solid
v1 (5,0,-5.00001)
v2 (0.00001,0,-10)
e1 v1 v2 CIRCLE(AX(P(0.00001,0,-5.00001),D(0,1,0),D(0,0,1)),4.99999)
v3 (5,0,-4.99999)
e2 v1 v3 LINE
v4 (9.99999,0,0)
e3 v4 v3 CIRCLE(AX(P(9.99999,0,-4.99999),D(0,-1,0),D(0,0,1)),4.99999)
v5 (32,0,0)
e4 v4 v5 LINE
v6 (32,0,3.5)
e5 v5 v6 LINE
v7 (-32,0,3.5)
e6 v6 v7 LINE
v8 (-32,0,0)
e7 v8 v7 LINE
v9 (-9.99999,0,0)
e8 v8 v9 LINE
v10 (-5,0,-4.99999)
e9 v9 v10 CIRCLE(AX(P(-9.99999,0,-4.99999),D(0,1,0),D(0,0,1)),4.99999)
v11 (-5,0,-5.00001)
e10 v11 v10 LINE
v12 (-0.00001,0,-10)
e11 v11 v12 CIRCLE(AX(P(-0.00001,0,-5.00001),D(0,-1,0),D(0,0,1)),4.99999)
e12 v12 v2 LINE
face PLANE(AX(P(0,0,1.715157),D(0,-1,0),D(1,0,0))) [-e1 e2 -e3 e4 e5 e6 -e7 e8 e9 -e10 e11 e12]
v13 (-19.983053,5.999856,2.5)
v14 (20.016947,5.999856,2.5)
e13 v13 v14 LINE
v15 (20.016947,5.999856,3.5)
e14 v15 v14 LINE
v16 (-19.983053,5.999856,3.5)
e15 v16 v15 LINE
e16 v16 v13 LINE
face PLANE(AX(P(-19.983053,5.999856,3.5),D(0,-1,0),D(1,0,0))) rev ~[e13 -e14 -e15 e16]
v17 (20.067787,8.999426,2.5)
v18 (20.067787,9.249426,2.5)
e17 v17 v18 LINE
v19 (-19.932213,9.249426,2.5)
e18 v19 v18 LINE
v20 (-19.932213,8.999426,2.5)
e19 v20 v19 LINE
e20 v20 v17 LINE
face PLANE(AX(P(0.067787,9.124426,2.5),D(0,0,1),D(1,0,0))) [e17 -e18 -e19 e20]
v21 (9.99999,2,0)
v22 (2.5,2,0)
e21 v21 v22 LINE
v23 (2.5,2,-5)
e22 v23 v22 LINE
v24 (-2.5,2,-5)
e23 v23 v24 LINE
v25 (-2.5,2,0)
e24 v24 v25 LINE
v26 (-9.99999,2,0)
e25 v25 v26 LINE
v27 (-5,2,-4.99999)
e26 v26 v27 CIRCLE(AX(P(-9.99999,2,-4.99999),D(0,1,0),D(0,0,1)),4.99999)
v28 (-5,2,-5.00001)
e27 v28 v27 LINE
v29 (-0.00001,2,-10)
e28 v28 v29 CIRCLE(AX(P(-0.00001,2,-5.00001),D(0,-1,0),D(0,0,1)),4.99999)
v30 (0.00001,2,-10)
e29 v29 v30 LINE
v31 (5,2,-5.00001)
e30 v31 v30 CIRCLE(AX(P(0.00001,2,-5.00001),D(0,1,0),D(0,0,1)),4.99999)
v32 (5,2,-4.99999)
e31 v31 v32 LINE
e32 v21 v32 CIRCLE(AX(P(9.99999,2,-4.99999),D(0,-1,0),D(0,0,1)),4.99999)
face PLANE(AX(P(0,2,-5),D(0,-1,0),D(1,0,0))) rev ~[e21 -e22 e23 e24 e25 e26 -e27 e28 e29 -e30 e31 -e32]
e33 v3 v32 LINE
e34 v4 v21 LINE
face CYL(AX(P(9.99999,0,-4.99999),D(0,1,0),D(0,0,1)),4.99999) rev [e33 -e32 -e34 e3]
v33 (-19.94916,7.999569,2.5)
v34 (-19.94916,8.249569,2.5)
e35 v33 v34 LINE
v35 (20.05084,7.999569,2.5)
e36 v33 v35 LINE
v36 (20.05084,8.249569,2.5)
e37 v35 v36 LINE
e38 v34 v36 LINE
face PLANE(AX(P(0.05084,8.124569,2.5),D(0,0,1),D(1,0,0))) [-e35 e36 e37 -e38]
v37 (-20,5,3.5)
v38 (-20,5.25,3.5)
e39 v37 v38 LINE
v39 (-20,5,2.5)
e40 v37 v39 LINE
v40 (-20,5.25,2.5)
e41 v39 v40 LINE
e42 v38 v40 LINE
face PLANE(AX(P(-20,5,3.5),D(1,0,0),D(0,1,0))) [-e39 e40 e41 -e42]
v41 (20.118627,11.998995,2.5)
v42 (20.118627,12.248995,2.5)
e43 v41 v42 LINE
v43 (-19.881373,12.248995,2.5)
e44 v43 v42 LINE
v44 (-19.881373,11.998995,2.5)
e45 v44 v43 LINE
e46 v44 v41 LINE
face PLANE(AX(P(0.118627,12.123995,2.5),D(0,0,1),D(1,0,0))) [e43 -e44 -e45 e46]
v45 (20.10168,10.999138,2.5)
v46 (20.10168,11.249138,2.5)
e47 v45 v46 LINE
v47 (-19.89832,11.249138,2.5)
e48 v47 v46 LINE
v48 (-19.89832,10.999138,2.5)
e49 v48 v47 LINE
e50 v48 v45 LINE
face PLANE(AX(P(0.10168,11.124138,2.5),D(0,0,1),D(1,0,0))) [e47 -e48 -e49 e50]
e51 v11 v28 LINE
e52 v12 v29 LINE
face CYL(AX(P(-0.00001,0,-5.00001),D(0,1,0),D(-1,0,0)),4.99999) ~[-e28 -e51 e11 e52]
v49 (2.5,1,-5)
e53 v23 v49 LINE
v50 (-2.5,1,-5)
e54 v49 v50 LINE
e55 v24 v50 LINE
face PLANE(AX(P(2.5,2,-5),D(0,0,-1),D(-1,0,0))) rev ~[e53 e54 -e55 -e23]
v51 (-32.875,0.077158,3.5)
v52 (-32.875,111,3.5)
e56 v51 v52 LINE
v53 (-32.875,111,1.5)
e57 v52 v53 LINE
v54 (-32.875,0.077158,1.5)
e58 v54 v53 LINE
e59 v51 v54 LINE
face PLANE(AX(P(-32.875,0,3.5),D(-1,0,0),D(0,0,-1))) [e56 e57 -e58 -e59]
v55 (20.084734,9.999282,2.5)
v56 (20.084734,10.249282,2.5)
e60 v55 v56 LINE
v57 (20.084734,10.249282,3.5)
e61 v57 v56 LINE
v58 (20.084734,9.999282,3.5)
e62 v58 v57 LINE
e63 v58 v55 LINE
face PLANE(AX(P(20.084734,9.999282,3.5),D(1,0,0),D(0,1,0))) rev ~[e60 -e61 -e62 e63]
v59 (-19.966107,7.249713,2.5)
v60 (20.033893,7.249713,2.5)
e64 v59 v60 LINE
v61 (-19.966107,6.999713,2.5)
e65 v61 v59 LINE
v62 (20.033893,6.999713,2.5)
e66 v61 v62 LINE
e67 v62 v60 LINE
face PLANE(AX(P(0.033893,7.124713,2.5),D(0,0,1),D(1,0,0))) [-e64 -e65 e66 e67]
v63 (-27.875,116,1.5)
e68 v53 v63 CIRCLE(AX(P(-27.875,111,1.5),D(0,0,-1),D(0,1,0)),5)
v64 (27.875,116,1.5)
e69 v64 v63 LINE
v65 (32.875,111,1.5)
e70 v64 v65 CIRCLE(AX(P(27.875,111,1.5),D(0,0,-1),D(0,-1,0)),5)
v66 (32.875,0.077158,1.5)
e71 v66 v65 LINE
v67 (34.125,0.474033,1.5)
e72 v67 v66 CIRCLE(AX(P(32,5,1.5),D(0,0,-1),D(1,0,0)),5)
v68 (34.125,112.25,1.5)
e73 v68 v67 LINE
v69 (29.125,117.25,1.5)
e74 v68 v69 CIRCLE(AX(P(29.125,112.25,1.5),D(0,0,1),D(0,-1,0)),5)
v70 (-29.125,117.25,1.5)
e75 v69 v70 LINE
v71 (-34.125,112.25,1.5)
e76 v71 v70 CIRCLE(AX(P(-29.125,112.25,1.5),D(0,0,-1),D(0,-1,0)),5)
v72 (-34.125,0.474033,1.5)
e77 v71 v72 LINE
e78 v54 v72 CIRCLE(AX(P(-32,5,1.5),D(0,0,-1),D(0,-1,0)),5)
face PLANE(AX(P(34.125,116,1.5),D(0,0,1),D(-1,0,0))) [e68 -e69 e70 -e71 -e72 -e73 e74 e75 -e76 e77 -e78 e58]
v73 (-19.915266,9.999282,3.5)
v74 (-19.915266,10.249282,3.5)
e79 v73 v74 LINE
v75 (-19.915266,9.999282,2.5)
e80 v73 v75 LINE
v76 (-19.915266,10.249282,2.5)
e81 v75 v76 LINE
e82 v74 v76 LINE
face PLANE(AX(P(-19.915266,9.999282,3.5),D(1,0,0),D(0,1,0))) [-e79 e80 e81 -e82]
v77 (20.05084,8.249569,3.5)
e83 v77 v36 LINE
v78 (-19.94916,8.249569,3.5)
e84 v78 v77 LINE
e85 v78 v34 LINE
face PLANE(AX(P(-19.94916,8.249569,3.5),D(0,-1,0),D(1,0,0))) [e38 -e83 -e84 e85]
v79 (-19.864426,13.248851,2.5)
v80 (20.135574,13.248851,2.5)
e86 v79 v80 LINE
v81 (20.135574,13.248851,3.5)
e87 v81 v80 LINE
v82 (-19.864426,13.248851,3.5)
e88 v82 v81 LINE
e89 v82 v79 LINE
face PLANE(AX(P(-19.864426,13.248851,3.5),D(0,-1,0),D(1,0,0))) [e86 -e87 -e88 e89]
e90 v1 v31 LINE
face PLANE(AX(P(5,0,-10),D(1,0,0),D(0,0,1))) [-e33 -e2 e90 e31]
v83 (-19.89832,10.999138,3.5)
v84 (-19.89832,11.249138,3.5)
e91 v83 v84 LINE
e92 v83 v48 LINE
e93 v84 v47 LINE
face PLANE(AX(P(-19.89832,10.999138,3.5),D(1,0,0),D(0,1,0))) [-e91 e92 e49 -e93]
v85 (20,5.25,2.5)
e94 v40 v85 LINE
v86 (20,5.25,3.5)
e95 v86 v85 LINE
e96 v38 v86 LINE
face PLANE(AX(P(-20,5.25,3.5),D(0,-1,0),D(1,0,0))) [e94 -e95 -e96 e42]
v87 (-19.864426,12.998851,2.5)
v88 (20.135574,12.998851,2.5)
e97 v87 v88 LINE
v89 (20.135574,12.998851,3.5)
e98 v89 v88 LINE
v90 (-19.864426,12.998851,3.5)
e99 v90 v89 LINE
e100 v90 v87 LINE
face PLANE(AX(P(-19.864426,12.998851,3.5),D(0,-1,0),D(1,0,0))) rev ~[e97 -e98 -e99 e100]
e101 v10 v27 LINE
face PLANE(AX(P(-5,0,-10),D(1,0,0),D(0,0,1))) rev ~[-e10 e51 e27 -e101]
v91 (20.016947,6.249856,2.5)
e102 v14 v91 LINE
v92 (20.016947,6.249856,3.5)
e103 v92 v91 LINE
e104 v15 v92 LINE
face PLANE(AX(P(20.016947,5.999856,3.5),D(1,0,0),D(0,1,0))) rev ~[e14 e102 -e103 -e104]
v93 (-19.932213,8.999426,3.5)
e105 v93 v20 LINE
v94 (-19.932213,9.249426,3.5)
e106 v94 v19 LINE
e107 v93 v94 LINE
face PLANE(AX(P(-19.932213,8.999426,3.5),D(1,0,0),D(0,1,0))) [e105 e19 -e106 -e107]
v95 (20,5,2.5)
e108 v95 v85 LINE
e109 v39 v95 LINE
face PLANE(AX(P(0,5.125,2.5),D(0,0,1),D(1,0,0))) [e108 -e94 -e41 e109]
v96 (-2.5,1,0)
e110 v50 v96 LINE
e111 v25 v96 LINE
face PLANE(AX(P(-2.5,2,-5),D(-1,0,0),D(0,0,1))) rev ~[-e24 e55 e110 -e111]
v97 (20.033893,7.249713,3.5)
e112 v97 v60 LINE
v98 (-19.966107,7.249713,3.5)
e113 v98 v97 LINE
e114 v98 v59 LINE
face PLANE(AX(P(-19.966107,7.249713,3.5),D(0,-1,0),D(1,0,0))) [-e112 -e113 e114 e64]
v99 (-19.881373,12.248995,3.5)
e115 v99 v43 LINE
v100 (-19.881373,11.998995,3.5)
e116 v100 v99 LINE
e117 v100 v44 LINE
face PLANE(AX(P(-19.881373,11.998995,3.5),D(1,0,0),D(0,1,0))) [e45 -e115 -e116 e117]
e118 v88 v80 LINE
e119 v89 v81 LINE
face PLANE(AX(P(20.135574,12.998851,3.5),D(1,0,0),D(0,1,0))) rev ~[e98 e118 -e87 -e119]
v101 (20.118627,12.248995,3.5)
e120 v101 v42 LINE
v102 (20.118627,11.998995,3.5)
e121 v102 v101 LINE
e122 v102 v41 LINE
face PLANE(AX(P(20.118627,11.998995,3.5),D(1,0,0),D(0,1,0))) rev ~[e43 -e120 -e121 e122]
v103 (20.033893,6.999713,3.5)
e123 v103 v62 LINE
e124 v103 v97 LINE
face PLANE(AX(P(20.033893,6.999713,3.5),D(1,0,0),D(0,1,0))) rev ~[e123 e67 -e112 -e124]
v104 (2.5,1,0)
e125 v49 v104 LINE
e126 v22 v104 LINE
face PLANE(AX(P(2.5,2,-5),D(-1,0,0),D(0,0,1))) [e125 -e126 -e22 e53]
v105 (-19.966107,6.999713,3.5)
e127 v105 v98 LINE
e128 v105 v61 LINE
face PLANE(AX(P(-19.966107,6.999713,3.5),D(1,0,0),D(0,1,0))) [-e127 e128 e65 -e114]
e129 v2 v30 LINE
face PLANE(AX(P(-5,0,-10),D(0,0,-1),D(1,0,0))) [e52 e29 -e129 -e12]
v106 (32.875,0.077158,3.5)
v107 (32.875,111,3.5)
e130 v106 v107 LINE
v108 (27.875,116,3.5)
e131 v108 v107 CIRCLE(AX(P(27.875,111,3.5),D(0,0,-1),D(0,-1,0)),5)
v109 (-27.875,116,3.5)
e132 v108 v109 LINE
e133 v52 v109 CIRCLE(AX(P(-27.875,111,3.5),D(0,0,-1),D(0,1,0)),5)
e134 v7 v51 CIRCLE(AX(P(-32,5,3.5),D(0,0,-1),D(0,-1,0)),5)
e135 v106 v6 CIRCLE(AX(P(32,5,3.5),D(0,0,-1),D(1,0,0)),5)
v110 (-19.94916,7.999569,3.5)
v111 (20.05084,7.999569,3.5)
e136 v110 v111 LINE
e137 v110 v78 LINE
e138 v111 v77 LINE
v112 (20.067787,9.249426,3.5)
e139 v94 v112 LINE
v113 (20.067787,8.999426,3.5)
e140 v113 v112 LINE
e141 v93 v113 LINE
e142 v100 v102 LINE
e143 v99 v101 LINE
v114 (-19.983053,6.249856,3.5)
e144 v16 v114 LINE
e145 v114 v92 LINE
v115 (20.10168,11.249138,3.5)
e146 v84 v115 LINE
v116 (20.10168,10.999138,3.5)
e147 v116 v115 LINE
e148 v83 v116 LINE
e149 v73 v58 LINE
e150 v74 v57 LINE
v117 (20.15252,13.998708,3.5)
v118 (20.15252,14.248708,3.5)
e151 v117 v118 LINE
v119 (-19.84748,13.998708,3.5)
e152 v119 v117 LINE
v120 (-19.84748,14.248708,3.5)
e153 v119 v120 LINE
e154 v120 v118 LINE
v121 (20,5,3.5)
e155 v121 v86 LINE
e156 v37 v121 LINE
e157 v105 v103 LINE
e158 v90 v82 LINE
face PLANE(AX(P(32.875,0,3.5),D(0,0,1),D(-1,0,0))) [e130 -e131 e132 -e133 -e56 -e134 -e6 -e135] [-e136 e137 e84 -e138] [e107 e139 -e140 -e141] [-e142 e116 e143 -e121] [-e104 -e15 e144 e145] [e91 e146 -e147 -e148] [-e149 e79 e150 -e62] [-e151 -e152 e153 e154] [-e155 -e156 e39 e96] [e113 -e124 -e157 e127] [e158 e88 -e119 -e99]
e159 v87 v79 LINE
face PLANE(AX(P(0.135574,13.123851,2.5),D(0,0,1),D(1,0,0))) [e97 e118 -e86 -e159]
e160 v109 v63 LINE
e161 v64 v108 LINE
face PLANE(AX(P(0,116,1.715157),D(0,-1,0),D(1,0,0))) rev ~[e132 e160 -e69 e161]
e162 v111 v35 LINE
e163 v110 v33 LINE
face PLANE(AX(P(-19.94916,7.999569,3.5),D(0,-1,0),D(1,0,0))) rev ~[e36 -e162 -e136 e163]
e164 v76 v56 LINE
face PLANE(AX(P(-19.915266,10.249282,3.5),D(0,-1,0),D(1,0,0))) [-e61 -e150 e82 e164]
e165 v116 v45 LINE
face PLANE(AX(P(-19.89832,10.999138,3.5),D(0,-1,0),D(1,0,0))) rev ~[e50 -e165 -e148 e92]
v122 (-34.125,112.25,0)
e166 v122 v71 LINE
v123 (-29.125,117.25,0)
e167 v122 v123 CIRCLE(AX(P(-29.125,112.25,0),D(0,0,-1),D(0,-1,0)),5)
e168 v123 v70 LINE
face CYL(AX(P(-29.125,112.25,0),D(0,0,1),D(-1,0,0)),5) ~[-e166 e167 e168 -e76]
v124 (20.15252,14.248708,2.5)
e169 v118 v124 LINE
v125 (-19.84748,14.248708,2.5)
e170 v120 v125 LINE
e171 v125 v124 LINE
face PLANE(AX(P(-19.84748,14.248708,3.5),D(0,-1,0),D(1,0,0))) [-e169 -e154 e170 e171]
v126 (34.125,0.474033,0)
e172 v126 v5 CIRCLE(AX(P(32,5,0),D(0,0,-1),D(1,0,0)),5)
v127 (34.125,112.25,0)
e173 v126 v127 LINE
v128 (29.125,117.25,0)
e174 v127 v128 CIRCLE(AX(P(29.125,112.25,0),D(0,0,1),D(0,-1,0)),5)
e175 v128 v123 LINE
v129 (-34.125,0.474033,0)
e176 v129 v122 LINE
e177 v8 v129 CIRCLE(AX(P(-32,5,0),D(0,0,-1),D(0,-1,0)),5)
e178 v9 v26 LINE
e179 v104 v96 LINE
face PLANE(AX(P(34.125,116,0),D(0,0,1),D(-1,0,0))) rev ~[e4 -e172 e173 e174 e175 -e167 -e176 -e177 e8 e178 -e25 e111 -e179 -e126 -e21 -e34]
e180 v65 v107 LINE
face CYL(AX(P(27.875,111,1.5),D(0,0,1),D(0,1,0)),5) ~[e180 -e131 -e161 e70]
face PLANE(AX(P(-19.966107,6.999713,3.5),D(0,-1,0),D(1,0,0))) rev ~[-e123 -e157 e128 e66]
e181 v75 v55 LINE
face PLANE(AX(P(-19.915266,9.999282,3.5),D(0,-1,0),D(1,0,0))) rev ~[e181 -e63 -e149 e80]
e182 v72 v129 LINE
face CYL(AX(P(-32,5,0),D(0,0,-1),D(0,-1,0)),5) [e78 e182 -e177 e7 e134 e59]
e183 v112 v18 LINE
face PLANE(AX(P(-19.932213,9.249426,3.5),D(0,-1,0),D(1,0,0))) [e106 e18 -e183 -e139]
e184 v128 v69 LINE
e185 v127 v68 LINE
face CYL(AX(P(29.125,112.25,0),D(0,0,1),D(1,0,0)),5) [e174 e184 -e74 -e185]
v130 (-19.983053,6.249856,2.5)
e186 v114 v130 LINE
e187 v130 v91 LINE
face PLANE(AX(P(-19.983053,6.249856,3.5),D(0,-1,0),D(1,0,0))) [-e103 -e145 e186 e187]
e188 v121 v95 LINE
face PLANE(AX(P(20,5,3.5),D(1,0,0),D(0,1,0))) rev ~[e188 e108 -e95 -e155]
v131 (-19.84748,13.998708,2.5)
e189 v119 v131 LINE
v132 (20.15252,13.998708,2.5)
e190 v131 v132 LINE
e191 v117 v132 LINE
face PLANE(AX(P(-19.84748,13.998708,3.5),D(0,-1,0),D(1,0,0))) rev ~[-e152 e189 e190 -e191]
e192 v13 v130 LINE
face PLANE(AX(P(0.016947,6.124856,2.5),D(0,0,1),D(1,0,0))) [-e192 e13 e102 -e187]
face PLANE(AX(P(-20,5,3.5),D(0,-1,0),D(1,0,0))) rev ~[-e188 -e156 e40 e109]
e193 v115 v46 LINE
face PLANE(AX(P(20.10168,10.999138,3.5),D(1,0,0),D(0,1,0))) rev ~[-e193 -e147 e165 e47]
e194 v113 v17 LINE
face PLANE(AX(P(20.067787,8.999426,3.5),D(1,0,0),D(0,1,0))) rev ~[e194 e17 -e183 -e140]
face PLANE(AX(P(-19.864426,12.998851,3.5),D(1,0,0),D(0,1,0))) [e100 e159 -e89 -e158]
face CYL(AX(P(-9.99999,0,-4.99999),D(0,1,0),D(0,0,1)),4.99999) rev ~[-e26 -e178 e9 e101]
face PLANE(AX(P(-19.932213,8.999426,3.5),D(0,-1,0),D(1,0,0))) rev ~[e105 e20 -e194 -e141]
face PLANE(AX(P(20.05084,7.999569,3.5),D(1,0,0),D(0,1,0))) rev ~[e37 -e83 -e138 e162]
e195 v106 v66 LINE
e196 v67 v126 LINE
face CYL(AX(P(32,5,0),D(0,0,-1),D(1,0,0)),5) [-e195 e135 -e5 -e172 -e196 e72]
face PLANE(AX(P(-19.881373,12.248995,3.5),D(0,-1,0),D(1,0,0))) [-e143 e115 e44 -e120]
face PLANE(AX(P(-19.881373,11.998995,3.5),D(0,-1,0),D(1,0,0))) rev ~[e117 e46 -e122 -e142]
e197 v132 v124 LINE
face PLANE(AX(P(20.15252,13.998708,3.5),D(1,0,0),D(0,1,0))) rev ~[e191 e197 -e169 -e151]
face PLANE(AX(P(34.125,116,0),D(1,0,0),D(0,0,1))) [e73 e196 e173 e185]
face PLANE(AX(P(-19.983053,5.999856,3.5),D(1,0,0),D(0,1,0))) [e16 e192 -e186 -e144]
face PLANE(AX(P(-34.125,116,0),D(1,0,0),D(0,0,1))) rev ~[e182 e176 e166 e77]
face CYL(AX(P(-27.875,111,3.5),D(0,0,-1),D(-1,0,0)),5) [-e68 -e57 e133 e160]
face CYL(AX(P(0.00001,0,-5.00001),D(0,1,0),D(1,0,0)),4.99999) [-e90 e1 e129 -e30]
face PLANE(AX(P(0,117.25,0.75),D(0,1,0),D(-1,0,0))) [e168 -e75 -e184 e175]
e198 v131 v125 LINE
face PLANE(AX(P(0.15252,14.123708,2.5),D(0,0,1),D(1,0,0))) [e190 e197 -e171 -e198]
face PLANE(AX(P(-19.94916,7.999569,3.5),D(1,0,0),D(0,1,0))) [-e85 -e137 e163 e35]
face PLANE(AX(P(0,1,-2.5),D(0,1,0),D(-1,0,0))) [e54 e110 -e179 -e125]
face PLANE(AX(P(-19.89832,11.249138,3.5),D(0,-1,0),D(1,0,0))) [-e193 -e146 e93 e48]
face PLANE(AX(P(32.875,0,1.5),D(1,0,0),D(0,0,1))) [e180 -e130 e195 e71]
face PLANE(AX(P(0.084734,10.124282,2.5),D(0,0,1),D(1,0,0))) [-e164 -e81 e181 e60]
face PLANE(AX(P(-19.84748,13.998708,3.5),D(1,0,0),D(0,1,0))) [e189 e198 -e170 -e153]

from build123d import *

# Parameters (mm, degrees)
F1_DEPTH  = 116
F2_W      = 68.25
F2_H      = 1.5
F3_DEPTH  = 1.25
F4_R      = 5
F6_DEPTH  = 25
F7_W      = 10
F7_H      = 10
F8_DEPTH  = 2
F9_R      = 4.99999
F10_W     = 5
F10_H     = 5
F11_DEPTH = 1
F12_W     = 40
F12_H     = 0.25
F13_DEPTH = 1


# Not quite as in the source:
# - a fillet or chamfer is up to 0.001 mm smaller than in the source, because OpenCascade refuses the exact size


with BuildPart() as f1:
    # F0 (on Front) → F1 (new body)
    with BuildSketch(Plane.XZ):
        Polygon((32.875, 1.5), (32.875, 3.5), (-32.875, 3.5), (-32.875, 1.5), (-34.125, 1.5), (-34.125, 0), (34.125, 0), (34.125, 1.5), align=None)
    extrude(amount=-F1_DEPTH)

    # F2 (on face) → F3 (join)
    with BuildSketch(Plane(origin=(0, 116, 0), x_dir=(-1, 0, 0), z_dir=(0, 1, 0))):
        with Locations((0, 0.75)):
            Rectangle(F2_W, F2_H)
    extrude(amount=F3_DEPTH)

    # F4
    f4_edges = [f1.edges().sort_by_distance(p)[0] for p in [
        (34.125, 117.25, 0.75),
        (-34.125, 117.25, 0.75),
        (-32.875, 116, 2.5),
        (32.875, 116, 2.5),
    ]]
    fillet(f4_edges, radius=F4_R)

    # F5 (on Top) → F6 (cut)
    with BuildSketch(Plane.XY):
        with BuildLine():
            ThreePointArc((-32, 0), (-35.5355339059, 1.4644660941), (-37, 5))
            Line((-37, 5), (-47.4459486902, 5.1317643374))
            Line((-47.4459486902, 5.1317643374), (-32.4784885049, -8.2395952195))
            Line((-32.4784885049, -8.2395952195), (-32, 0))
        make_face()
        with BuildLine():
            Line((47.8749121428, 4.8458835855), (37, 4.9999998882))
            ThreePointArc((37, 4.9999998882), (35.5355339059, 1.4644659823), (32, -1.118e-07))
            Line((32, -1.118e-07), (31.699370116, -9.054190591))
            Line((31.699370116, -9.054190591), (47.8749121428, 4.8458835855))
        make_face()
    extrude(amount=F6_DEPTH, mode=Mode.SUBTRACT)

    # F7 (on face) → F8 (join)
    with BuildSketch(Plane.XZ):
        with Locations((0, -5)):
            Rectangle(F7_W, F7_H)
    extrude(amount=-F8_DEPTH)

    # F9 (radius 5 in the source; OpenCascade refuses exactly that, so slightly less here)
    f9_edges = [f1.edges().sort_by_distance(p)[0] for p in [
        (5, 1, 0),
        (-5, 1, 0),
        (-5, 1, -10),
        (5, 1, -10),
    ]]
    fillet(f9_edges, radius=F9_R)

    # F10 (on face) → F11 (cut)
    with BuildSketch(Plane(origin=(0, 2, 0), x_dir=(-1, 0, 0), z_dir=(0, 1, 0))):
        with Locations((0, -2.5)):
            Rectangle(F10_W, F10_H)
    extrude(amount=-F11_DEPTH, mode=Mode.SUBTRACT)

    # F12 (on face) → F13 (cut)
    with BuildSketch(Plane.XY.offset(3.5)):
        with Locations((0, 5.125)):
            Rectangle(F12_W, F12_H)
        with Locations((0.0169467185, 6.1248563941)):
            Rectangle(F12_W, F12_H)
        with Locations((0.0338934371, 7.1247127881)):
            Rectangle(F12_W, F12_H)
        with Locations((0.0508401556, 8.1245691822)):
            Rectangle(F12_W, F12_H)
        with Locations((0.0677868742, 9.1244255762)):
            Rectangle(F12_W, F12_H)
        with Locations((0.0847335927, 10.1242819703)):
            Rectangle(F12_W, F12_H)
        with Locations((0.1016803113, 11.1241383643)):
            Rectangle(F12_W, F12_H)
        with Locations((0.1186270298, 12.1239947584)):
            Rectangle(F12_W, F12_H)
        with Locations((0.1355737483, 13.1238511524)):
            Rectangle(F12_W, F12_H)
        with Locations((0.1525204669, 14.1237075465)):
            Rectangle(F12_W, F12_H)
    extrude(amount=-F13_DEPTH, mode=Mode.SUBTRACT)


solid = f1.part
